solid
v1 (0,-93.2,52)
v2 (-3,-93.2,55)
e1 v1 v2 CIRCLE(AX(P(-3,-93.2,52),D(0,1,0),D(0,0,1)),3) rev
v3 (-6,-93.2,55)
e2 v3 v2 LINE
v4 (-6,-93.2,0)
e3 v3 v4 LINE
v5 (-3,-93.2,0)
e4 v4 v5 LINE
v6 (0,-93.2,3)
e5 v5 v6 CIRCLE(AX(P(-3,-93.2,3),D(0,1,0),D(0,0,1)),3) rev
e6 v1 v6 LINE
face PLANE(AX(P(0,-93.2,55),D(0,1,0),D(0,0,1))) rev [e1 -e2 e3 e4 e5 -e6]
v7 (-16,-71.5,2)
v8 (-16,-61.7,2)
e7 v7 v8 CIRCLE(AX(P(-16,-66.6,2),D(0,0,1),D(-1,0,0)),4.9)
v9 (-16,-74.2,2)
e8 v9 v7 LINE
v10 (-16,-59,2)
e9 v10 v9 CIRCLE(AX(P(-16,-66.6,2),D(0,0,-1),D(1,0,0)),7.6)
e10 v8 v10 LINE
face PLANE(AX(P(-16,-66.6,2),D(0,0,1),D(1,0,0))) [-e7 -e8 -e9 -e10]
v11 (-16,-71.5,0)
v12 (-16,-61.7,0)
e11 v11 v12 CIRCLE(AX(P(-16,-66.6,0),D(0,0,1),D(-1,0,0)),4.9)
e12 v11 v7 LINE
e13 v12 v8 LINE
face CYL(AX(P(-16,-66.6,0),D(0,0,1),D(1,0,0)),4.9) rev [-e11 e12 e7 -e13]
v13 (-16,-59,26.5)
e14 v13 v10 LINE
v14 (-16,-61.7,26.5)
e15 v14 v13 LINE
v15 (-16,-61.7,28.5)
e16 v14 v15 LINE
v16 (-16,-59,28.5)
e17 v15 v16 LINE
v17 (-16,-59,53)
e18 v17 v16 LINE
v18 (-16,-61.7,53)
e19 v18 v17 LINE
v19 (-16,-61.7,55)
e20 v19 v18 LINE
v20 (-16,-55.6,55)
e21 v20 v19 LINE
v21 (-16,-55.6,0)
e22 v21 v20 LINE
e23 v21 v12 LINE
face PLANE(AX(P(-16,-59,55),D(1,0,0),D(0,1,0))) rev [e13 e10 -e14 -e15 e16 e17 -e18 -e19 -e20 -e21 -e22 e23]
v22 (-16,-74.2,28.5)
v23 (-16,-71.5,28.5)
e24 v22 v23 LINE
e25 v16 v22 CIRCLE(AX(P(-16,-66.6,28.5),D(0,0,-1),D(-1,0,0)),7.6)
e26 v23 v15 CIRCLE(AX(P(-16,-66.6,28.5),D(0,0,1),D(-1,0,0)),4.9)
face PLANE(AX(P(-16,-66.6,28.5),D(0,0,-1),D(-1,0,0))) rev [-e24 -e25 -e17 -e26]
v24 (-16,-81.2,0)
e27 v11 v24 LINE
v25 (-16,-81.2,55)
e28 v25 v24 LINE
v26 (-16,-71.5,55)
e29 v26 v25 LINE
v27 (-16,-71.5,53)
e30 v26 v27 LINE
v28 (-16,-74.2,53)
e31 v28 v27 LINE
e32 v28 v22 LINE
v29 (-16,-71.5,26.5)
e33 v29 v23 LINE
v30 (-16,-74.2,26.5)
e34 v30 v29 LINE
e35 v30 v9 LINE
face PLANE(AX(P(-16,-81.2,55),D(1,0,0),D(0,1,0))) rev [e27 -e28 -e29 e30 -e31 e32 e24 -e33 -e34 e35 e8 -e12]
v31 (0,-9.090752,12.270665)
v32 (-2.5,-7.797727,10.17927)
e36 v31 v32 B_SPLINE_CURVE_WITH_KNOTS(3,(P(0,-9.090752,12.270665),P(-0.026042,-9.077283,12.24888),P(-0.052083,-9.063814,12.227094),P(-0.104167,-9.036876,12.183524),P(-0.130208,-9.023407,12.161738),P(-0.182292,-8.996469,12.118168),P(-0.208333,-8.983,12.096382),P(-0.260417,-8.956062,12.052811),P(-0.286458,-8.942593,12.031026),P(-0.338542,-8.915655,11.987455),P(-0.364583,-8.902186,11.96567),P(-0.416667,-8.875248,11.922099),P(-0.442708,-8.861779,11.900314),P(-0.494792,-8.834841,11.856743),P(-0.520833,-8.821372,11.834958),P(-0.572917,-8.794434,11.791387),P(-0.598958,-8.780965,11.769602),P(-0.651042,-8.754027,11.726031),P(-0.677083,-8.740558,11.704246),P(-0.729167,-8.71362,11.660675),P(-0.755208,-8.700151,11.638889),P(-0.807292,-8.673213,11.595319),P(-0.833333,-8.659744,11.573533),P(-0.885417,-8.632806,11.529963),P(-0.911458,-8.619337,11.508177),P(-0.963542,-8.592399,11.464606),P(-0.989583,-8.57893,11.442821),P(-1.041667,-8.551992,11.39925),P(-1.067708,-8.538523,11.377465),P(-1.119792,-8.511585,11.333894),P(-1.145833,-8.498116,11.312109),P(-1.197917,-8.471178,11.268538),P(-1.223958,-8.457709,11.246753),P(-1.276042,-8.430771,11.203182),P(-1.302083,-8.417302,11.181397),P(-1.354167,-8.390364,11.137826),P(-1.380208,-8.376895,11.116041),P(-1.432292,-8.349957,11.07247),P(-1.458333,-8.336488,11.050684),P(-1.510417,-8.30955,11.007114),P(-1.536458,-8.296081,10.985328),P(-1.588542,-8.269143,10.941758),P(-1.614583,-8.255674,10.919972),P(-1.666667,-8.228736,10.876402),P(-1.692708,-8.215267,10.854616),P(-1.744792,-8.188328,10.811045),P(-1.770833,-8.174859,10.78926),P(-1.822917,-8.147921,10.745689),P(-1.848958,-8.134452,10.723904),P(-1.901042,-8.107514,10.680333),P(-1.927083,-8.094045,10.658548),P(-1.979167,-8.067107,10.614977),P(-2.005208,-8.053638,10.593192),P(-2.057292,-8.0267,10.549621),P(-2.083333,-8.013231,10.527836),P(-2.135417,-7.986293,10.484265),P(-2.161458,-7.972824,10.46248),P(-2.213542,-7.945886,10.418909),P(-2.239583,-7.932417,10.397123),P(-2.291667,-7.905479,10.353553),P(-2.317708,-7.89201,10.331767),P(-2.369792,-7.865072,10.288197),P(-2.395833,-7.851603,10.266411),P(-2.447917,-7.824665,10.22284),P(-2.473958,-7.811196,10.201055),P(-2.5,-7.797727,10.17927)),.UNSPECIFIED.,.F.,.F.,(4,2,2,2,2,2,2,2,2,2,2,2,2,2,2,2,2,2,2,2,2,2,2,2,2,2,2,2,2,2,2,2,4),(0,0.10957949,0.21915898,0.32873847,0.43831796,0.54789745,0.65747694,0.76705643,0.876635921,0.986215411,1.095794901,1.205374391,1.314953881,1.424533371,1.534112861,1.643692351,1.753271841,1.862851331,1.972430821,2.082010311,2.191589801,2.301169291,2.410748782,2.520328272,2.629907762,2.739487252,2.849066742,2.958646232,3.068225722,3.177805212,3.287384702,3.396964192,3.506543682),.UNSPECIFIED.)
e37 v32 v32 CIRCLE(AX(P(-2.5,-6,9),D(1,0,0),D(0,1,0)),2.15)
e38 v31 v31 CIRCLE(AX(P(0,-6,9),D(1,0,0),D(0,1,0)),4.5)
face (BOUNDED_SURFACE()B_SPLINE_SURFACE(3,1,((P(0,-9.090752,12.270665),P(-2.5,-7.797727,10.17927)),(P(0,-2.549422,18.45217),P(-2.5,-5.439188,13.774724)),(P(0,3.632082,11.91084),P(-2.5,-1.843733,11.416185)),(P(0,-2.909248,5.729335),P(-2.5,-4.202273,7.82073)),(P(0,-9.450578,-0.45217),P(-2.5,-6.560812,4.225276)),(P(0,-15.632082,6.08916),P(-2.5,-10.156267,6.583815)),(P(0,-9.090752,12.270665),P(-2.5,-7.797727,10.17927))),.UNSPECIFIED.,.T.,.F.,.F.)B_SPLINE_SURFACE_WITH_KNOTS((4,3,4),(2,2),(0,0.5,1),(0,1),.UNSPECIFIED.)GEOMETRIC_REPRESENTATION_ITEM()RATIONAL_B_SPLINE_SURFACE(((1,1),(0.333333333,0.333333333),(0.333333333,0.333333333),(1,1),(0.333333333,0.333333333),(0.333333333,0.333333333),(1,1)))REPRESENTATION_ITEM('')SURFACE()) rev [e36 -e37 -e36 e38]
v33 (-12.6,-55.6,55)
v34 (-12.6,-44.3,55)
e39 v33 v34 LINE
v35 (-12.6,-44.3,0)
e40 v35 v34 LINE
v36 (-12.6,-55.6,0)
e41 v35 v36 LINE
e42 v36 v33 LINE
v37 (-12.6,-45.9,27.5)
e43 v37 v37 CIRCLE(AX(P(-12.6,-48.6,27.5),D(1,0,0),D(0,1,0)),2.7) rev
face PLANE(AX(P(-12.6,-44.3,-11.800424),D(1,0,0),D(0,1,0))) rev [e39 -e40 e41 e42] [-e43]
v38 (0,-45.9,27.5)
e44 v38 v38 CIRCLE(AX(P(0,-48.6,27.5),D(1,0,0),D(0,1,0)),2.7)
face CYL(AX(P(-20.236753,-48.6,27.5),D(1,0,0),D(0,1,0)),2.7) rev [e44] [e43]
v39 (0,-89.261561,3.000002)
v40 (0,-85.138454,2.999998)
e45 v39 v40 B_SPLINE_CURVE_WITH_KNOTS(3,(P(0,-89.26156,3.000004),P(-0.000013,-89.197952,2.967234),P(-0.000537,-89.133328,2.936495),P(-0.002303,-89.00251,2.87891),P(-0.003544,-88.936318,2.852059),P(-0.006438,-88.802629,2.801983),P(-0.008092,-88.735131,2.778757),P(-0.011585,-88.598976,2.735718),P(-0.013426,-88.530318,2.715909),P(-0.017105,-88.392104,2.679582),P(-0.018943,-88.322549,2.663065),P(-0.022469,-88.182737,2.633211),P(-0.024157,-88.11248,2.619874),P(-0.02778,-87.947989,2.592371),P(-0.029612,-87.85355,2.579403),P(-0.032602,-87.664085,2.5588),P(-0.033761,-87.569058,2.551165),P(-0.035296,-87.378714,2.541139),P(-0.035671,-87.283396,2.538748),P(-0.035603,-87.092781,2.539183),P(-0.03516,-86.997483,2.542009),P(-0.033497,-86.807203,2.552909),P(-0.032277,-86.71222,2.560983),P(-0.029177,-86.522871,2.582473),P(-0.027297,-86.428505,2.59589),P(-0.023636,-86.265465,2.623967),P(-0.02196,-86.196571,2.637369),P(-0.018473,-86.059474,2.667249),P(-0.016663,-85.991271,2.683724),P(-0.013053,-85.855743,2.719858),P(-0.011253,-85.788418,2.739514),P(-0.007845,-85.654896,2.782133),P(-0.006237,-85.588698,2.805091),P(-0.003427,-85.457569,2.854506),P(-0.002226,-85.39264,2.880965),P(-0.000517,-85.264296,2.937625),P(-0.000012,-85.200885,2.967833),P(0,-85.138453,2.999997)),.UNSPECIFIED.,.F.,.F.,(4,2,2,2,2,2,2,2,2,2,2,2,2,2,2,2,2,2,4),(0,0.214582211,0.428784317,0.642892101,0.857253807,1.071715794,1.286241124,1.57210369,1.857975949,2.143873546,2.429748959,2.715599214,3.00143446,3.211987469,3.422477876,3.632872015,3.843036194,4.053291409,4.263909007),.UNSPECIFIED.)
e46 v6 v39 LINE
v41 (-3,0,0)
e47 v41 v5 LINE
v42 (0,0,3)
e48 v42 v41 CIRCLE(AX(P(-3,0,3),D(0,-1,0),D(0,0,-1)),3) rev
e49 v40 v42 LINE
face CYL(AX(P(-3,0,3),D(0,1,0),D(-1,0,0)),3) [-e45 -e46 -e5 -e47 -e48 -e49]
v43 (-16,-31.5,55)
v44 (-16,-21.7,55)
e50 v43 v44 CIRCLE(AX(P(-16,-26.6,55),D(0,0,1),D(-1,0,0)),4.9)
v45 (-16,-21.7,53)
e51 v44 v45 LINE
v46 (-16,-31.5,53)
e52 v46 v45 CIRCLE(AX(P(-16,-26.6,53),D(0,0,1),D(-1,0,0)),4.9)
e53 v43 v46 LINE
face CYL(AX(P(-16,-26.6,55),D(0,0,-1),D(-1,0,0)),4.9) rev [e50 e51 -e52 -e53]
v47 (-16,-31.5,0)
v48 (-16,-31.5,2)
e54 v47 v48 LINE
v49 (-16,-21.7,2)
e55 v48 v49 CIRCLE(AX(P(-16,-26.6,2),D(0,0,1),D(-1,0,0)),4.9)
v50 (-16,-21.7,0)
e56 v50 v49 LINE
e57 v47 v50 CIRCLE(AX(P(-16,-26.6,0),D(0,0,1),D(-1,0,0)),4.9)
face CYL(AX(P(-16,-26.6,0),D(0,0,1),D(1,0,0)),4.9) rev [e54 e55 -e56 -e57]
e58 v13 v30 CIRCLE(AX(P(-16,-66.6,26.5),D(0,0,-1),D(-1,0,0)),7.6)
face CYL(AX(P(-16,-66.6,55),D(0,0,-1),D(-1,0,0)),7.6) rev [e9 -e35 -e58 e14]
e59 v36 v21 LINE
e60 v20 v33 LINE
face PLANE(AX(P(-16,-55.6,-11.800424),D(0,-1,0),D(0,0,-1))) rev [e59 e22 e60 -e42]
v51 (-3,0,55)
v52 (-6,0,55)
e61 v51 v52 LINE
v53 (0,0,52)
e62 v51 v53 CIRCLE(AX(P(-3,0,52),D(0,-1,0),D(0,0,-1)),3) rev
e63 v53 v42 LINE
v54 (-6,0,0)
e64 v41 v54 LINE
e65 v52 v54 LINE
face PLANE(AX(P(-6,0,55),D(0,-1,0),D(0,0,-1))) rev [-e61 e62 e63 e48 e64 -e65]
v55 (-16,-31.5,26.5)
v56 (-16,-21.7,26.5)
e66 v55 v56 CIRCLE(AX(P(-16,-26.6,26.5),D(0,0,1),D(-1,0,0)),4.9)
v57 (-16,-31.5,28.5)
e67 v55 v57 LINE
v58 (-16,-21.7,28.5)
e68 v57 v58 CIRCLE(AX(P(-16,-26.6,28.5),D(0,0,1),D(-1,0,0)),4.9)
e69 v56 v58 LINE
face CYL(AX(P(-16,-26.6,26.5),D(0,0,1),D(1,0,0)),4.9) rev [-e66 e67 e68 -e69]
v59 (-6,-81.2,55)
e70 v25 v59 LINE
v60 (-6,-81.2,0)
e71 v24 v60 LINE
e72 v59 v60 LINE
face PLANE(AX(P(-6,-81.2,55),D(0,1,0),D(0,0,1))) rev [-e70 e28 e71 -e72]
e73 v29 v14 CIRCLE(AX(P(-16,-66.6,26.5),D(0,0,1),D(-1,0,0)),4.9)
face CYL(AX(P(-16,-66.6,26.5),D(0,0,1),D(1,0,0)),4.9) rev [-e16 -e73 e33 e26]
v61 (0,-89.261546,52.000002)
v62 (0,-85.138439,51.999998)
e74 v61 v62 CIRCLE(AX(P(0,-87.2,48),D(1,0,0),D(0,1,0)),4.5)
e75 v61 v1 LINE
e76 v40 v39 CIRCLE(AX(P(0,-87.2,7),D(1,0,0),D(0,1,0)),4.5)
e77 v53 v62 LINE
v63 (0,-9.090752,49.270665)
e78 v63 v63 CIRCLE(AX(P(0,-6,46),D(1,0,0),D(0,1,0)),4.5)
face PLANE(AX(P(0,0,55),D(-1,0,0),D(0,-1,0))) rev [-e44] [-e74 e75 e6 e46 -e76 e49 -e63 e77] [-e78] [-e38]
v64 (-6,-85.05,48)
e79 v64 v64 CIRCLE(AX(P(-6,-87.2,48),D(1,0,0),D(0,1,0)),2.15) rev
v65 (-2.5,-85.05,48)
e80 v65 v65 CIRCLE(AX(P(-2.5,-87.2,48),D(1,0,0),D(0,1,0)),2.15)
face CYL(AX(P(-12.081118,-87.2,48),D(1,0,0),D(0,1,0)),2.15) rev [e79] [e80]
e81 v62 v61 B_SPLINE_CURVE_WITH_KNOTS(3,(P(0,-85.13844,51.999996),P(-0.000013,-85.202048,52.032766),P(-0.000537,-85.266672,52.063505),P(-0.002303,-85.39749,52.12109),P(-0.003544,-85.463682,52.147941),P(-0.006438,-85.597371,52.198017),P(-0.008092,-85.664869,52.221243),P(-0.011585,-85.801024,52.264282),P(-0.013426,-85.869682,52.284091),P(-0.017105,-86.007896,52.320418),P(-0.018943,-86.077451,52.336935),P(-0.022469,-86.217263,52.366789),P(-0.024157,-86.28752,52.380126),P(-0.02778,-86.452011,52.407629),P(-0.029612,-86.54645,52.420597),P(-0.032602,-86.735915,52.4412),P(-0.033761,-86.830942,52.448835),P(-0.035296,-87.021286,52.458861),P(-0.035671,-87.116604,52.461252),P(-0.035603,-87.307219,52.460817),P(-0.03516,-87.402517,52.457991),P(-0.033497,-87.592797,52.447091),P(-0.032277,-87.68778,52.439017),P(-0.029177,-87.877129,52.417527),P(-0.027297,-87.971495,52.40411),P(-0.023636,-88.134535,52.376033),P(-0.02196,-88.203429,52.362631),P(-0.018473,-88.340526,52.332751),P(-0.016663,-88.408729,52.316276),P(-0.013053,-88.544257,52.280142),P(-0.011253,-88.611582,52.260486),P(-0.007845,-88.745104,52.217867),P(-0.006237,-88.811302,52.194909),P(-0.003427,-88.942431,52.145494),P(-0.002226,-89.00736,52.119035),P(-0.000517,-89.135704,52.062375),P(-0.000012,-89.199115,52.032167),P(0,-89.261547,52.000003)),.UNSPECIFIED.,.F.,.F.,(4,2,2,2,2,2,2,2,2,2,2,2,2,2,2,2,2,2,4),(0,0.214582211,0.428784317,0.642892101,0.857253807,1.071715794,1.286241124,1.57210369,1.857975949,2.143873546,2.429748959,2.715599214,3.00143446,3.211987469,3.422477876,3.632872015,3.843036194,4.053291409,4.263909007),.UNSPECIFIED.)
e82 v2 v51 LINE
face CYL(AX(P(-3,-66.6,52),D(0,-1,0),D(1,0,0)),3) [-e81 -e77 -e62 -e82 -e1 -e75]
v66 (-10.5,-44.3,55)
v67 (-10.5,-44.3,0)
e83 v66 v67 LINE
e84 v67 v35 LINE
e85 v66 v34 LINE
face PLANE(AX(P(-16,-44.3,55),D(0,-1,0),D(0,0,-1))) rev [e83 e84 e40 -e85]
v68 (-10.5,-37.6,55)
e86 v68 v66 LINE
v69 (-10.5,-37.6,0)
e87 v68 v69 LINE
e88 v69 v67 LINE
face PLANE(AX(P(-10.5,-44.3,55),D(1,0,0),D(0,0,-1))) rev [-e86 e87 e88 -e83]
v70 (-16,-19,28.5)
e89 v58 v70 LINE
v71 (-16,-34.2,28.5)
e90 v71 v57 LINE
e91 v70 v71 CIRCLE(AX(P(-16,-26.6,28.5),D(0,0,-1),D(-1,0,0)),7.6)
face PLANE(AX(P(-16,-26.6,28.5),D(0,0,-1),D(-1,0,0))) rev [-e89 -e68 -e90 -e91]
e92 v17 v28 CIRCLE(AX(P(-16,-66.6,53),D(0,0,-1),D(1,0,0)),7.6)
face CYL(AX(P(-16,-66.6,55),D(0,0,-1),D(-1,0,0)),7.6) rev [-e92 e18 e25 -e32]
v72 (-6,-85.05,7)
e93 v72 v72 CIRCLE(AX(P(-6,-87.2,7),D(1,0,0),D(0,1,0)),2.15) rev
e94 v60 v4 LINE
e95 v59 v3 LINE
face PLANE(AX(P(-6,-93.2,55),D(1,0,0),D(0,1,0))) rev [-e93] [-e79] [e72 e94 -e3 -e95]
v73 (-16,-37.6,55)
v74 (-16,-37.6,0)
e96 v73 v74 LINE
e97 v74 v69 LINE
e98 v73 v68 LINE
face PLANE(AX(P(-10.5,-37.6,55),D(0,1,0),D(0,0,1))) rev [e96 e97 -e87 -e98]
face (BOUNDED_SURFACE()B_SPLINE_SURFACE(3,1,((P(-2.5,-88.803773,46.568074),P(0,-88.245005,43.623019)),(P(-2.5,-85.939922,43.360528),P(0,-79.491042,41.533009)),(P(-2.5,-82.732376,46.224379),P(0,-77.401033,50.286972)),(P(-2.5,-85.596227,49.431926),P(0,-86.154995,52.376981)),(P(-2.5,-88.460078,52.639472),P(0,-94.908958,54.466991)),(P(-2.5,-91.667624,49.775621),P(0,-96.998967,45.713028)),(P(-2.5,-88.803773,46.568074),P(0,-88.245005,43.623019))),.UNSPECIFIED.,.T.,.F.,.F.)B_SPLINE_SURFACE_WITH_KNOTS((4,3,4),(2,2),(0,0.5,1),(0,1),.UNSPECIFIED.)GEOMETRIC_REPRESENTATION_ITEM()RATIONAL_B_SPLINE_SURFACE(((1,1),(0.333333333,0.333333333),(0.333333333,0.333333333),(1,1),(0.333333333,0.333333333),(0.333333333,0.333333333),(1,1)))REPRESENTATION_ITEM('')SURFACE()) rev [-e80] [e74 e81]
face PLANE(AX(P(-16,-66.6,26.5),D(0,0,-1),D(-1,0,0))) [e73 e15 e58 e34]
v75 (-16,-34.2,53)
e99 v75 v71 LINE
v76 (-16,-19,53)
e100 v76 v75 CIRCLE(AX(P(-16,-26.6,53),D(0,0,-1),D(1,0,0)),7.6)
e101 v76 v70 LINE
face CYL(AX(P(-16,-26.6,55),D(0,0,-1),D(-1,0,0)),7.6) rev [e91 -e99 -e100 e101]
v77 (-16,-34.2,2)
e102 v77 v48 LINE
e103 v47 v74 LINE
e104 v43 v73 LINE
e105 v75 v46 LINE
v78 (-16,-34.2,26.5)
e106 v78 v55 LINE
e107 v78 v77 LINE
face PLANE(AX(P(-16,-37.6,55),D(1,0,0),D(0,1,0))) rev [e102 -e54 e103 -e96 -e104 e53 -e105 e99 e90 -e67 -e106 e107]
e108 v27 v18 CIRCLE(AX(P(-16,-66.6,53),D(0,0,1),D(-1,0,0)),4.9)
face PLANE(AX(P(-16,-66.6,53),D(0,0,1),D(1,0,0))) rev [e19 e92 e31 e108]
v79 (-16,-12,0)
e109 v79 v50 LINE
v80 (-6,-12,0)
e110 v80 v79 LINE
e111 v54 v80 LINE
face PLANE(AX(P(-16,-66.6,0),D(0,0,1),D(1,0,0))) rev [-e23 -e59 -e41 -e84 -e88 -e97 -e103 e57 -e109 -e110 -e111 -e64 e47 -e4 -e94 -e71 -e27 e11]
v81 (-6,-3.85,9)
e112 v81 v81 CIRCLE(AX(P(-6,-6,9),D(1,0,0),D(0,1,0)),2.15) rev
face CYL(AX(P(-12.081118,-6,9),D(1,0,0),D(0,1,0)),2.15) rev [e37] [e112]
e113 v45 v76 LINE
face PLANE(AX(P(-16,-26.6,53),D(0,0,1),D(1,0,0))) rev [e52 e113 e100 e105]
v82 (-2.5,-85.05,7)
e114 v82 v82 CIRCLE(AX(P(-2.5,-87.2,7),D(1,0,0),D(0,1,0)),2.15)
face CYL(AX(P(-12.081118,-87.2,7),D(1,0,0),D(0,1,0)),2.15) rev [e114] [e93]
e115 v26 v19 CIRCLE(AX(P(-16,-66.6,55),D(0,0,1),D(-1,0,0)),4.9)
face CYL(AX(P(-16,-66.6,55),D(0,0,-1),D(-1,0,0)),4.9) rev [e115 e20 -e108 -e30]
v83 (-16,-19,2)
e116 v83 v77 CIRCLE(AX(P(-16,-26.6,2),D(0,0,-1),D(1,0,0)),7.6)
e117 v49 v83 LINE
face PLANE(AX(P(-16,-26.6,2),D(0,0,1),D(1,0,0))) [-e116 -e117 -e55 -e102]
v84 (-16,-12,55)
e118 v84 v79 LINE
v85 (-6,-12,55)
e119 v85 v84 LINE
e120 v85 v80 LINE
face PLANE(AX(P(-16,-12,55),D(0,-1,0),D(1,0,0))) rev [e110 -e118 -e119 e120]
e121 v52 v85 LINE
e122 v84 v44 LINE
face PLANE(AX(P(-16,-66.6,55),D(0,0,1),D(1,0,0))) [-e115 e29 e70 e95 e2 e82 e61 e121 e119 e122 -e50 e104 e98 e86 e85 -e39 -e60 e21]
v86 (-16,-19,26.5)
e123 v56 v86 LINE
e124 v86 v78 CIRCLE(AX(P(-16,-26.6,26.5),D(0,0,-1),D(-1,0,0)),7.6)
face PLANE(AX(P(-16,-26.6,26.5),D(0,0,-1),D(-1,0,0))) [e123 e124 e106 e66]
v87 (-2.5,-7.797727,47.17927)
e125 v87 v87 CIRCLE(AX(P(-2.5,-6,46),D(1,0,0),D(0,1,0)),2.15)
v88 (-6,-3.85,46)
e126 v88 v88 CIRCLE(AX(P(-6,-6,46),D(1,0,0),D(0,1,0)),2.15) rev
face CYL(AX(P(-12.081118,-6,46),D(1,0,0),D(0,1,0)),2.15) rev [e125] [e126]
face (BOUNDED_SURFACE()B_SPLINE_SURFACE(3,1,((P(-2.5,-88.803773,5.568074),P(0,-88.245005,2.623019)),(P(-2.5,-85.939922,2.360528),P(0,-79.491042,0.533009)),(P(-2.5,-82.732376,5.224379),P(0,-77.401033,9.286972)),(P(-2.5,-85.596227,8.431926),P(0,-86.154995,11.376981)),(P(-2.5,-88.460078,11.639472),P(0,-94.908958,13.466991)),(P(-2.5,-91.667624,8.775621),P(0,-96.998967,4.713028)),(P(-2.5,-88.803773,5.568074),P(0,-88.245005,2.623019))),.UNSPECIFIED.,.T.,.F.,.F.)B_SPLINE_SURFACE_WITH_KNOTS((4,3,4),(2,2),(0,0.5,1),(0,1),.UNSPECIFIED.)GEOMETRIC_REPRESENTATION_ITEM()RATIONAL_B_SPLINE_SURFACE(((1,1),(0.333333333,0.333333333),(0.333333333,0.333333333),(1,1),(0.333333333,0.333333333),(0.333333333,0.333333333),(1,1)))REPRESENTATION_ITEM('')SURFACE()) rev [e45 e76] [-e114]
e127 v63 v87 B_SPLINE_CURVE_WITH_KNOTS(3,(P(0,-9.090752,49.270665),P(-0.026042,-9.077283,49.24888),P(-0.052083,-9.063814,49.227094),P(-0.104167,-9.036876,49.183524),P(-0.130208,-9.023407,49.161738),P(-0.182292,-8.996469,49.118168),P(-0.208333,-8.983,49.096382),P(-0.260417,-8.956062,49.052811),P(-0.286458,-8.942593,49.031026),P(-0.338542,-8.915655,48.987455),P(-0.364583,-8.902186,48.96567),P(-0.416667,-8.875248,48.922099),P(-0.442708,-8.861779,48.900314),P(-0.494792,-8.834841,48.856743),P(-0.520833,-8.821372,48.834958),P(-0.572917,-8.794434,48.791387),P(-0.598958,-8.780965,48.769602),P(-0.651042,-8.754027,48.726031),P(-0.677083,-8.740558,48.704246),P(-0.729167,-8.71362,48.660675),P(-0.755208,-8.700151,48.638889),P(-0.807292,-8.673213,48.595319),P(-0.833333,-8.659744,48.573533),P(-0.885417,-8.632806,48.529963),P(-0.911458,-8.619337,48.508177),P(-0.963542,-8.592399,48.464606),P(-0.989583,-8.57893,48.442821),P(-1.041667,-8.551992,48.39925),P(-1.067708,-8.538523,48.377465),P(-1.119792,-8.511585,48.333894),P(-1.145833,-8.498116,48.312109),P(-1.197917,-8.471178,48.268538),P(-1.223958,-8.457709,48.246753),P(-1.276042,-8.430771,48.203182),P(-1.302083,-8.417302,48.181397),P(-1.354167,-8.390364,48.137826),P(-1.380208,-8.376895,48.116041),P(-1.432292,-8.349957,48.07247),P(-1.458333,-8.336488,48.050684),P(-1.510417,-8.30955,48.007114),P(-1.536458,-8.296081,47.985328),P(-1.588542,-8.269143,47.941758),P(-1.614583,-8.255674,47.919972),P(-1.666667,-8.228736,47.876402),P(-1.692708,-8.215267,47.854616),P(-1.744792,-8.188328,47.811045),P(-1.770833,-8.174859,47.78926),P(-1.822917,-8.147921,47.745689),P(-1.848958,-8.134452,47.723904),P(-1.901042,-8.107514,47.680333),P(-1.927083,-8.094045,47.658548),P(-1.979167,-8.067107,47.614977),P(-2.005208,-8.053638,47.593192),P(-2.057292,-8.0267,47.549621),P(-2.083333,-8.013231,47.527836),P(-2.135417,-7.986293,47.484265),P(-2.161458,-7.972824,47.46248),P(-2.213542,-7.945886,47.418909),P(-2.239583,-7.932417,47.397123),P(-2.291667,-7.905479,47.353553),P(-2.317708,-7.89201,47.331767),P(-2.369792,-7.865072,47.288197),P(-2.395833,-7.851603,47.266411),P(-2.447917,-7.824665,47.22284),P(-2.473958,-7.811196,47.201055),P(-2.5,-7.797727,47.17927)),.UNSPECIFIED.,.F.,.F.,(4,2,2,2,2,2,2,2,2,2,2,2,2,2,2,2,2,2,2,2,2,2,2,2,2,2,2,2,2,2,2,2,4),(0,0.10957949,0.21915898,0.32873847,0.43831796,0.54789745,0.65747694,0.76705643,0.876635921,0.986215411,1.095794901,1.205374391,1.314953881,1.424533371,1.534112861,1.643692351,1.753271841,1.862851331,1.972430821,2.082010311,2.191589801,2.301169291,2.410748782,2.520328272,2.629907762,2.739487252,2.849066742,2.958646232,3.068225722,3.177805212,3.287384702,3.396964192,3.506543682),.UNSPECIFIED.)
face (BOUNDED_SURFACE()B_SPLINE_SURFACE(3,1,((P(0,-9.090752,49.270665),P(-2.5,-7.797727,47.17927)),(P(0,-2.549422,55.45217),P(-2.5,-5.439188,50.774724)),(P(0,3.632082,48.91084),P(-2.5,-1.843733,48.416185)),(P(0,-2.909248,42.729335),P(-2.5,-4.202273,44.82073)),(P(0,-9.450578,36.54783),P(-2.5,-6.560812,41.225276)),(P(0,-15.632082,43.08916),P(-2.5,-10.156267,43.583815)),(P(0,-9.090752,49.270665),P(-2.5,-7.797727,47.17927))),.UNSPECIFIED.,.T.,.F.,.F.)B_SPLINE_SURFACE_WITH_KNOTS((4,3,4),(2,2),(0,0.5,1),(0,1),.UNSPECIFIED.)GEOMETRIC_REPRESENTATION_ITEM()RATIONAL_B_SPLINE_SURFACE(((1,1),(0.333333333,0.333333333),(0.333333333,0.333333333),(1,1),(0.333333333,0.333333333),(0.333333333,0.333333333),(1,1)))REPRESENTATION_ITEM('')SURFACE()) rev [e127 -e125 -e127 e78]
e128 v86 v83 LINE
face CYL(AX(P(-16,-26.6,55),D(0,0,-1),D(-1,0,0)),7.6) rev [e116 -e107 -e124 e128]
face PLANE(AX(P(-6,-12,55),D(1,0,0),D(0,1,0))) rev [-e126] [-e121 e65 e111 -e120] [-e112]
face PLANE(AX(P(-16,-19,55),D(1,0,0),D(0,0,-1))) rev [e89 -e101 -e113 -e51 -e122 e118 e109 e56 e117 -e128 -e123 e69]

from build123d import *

# Parameters (mm, degrees)
BOSS_EXTRUDE1_DEPTH = 55
BOSS_EXTRUDE2_START = 2
BOSS_EXTRUDE2_DEPTH = 2
BOSS_EXTRUDE3_START = 2
BOSS_EXTRUDE3_DEPTH = 2
BOSS_EXTRUDE5_START = 2
BOSS_EXTRUDE5_DEPTH = 2
BOSS_EXTRUDE6_DEPTH = 2
SKETCH7_W           = 3.4
SKETCH7_H           = 11.3
CUT_EXTRUDE2_DEPTH  = 55
SKETCH8_R           = 2.15
CUT_EXTRUDE3_DEPTH  = 6
SKETCH9_R           = 2.7
CUT_EXTRUDE4_DEPTH  = 12.6
LPATTERN1_COUNT     = 2
LPATTERN1_PITCH     = 37
LPATTERN2_COUNT     = 2
LPATTERN2_PITCH     = 41
FILLET1_R           = 3


with BuildPart() as part:
    # Sketch1 → Boss-Extrude1 (new body)
    with BuildSketch(Plane.XY):
        with BuildLine():
            Line((0, 0), (0, -93.2))
            Line((0, -93.2), (-6, -93.2))
            Line((-6, -93.2), (-6, -81.2))
            Line((-6, -81.2), (-16, -81.2))
            Line((-16, -81.2), (-16, -74.2))
            ThreePointArc((-16, -74.2), (-8.4, -66.6), (-16, -59))
            Line((-16, -59), (-16, -44.3))
            Line((-16, -44.3), (-10.5, -44.3))
            Line((-10.5, -44.3), (-10.5, -37.6))
            Line((-10.5, -37.6), (-16, -37.6))
            Line((-16, -37.6), (-16, -34.2))
            ThreePointArc((-16, -34.2), (-8.4, -26.6), (-16, -19))
            Line((-16, -19), (-16, -12))
            Line((-16, -12), (-6, -12))
            Line((-6, -12), (-6, 0))
            Line((-6, 0), (0, 0))
        make_face()
    extrude(amount=BOSS_EXTRUDE1_DEPTH)

    # Sketch2 → Boss-Extrude2 (add)
    with BuildSketch(Plane(origin=(0, 0, 28.5), x_dir=(-1, 0, 0), z_dir=(0, 0, -1)).offset(BOSS_EXTRUDE2_START)):
        with BuildLine():
            Line((16, -34.2), (16, -31.5))
            ThreePointArc((16, -31.5), (11.1, -26.6), (16, -21.7))
            Line((16, -21.7), (16, -19))
            ThreePointArc((16, -19), (8.4, -26.6), (16, -34.2))
        make_face()
    extrude(amount=-BOSS_EXTRUDE2_DEPTH)

    # Sketch3 → Boss-Extrude3 (add)
    with BuildSketch(Plane(origin=(0, 0, 28.5), x_dir=(-1, 0, 0), z_dir=(0, 0, -1)).offset(BOSS_EXTRUDE3_START)):
        with BuildLine():
            Line((16, -74.2), (16, -71.5))
            ThreePointArc((16, -71.5), (11.1, -66.6), (16, -61.7))
            Line((16, -61.7), (16, -59))
            ThreePointArc((16, -59), (8.4, -66.6), (16, -74.2))
        make_face()
    extrude(amount=-BOSS_EXTRUDE3_DEPTH)

    # Sketch4 → Boss-Extrude5 (add)
    with BuildSketch(Plane(origin=(0, 0, 2), x_dir=(-1, 0, 0), z_dir=(0, 0, -1)).offset(BOSS_EXTRUDE5_START)):
        with BuildLine():
            Line((16, -59), (16, -61.7))
            ThreePointArc((16, -61.7), (11.1, -66.6), (16, -71.5))
            Line((16, -71.5), (16, -74.2))
            ThreePointArc((16, -74.2), (8.4, -66.6), (16, -59))
        make_face()
        with BuildLine():
            Line((16, -19), (16, -21.7))
            ThreePointArc((16, -21.7), (11.1, -26.6), (16, -31.5))
            Line((16, -31.5), (16, -34.2))
            ThreePointArc((16, -34.2), (8.4, -26.6), (16, -19))
        make_face()
    extrude(amount=-BOSS_EXTRUDE5_DEPTH)

    # Sketch5 → Boss-Extrude6 (add)
    with BuildSketch(Plane(origin=(0, 0, 53), x_dir=(-1, 0, 0), z_dir=(0, 0, -1))):
        with BuildLine():
            Line((16, -19), (16, -21.7))
            ThreePointArc((16, -21.7), (11.1, -26.6), (16, -31.5))
            Line((16, -31.5), (16, -34.2))
            ThreePointArc((16, -34.2), (8.4, -26.6), (16, -19))
        make_face()
        with BuildLine():
            Line((16, -59), (16, -61.7))
            ThreePointArc((16, -61.7), (11.1, -66.6), (16, -71.5))
            Line((16, -71.5), (16, -74.2))
            ThreePointArc((16, -74.2), (8.4, -66.6), (16, -59))
        make_face()
    extrude(amount=-BOSS_EXTRUDE6_DEPTH)

    # Sketch7 → Cut-Extrude2 (cut)
    with BuildSketch(Plane.XY.offset(55)):
        with Locations((-14.3, -49.95)):
            Rectangle(SKETCH7_W, SKETCH7_H)
    extrude(amount=-CUT_EXTRUDE2_DEPTH, mode=Mode.SUBTRACT)

    # Sketch8 → Cut-Extrude3 (cut)
    with BuildSketch(Plane(origin=(0, 0, 0), x_dir=(0, 0, -1), z_dir=(1, 0, 0))):
        with Locations(Location((-46, -6, 0), (0, 0, 90))):
            Circle(SKETCH8_R)
        with Locations(Location((-9, -6, 0), (0, 0, 90))):
            Circle(SKETCH8_R)
        with Locations(Location((-7, -87.2, 0), (0, 0, 90))):
            Circle(SKETCH8_R)
        with Locations(Location((-48, -87.2, 0), (0, 0, 90))):
            Circle(SKETCH8_R)
    extrude(amount=-CUT_EXTRUDE3_DEPTH, mode=Mode.SUBTRACT)

    # Sketch9 → Cut-Extrude4 (cut)
    with BuildSketch(Plane(origin=(0, 0, 0), x_dir=(0, 0, -1), z_dir=(1, 0, 0))):
        with Locations(Location((-27.5, -48.6, 0), (0, 0, 90))):
            Circle(SKETCH9_R)
    extrude(amount=-CUT_EXTRUDE4_DEPTH, mode=Mode.SUBTRACT)

    # Cut-Loft1: read off the stored shape, not the designer's step
    # Cut-Loft1: loft between two sections, ruled curve by curve
    cut_loft1_from = [
        Edge.make_bspline([(0, -9.090752309, 49.270665095), (0, -2.54942212, 55.452169714), (0, 3.632082499, 48.910839524), (0, -2.909247691, 42.729334905), (0, -9.45057788, 36.547830286), (0, -15.632082499, 43.089160476), (0, -9.090752309, 49.270665095)], [0, 0, 0, 0, 0.5, 0.5, 0.5, 1, 1, 1, 1], 3, [1, 0.333333333, 0.333333333, 1, 0.333333333, 0.333333333, 1]),
    ]
    cut_loft1_to = [
        Edge.make_bspline([(-2.5, -7.797727139, 47.179269746), (-2.5, -5.439187646, 50.774724024), (-2.5, -1.843733369, 48.416184531), (-2.5, -4.202272861, 44.820730254), (-2.5, -6.560812354, 41.225275976), (-2.5, -10.156266631, 43.583815469), (-2.5, -7.797727139, 47.179269746)], [0, 0, 0, 0, 0.5, 0.5, 0.5, 1, 1, 1, 1], 3, [1, 0.333333333, 0.333333333, 1, 0.333333333, 0.333333333, 1]),
    ]
    cut_loft1 = Solid(Shell([*[Face.make_surface_from_curves(cut_loft1_from[k], cut_loft1_to[k]) for k in range(1)], Face(Wire(cut_loft1_from)), Face(Wire(cut_loft1_to))]))
    add(cut_loft1, mode=Mode.SUBTRACT)

    # LPattern1: Cut-Loft1 ×2
    with Locations(*[(0, 0, -i * LPATTERN1_PITCH) for i in range(1, LPATTERN1_COUNT)]):
        add(cut_loft1, mode=Mode.SUBTRACT)

    # Cut-Loft2: read off the stored shape, not the designer's step
    # Cut-Loft2: loft between two sections, ruled curve by curve
    cut_loft2_from = [
        Edge.make_bspline([(-2.5, -88.803773463, 46.568074485), (-2.5, -85.939922433, 43.36052756), (-2.5, -82.732375507, 46.22437859), (-2.5, -85.596226537, 49.431925515), (-2.5, -88.460077567, 52.63947244), (-2.5, -91.667624493, 49.77562141), (-2.5, -88.803773463, 46.568074485)], [0, 0, 0, 0, 0.5, 0.5, 0.5, 1, 1, 1, 1], 3, [1, 0.333333333, 0.333333333, 1, 0.333333333, 0.333333333, 1]),
    ]
    cut_loft2_to = [
        Edge.make_bspline([(0, -88.245004687, 43.623018711), (0, -79.491042109, 41.533009337), (0, -77.401032735, 50.286971915), (0, -86.154995313, 52.376981289), (0, -94.908957891, 54.466990663), (0, -96.998967265, 45.713028085), (0, -88.245004687, 43.623018711)], [0, 0, 0, 0, 0.5, 0.5, 0.5, 1, 1, 1, 1], 3, [1, 0.333333333, 0.333333333, 1, 0.333333333, 0.333333333, 1]),
    ]
    cut_loft2 = Solid(Shell([*[Face.make_surface_from_curves(cut_loft2_from[k], cut_loft2_to[k]) for k in range(1)], Face(Wire(cut_loft2_from)), Face(Wire(cut_loft2_to))]))
    add(cut_loft2, mode=Mode.SUBTRACT)

    # LPattern2: Cut-Loft2 ×2
    with Locations(*[(0, 0, -i * LPATTERN2_PITCH) for i in range(1, LPATTERN2_COUNT)]):
        add(cut_loft2, mode=Mode.SUBTRACT)

    # Fillet1
    # the kernel refuses this fillet: 3 mm, written as the material it takes off along each edge
    with BuildSketch(Plane(origin=(0, 7.5, 0), x_dir=(-1, 0, 0), z_dir=(0, -1, 0))) as fillet1_piece_1:
        with BuildLine():
            CenterArc((FILLET1_R, -FILLET1_R), FILLET1_R, 90, 90)
            Line((0, -FILLET1_R), (0, 0))
            Line((0, 0), (FILLET1_R, 0))
        make_face()
    extrude(amount=108.2, mode=Mode.SUBTRACT)
    with BuildSketch(Plane(origin=(0, 7.5, 55), x_dir=(-1, 0, 0), z_dir=(0, -1, 0))) as fillet1_piece_2:
        with BuildLine():
            CenterArc((FILLET1_R, FILLET1_R), FILLET1_R, 180, 90)
            Line((0, FILLET1_R), (0, 0))
            Line((0, 0), (FILLET1_R, 0))
        make_face()
    extrude(amount=108.2, mode=Mode.SUBTRACT)


solid = part.part
